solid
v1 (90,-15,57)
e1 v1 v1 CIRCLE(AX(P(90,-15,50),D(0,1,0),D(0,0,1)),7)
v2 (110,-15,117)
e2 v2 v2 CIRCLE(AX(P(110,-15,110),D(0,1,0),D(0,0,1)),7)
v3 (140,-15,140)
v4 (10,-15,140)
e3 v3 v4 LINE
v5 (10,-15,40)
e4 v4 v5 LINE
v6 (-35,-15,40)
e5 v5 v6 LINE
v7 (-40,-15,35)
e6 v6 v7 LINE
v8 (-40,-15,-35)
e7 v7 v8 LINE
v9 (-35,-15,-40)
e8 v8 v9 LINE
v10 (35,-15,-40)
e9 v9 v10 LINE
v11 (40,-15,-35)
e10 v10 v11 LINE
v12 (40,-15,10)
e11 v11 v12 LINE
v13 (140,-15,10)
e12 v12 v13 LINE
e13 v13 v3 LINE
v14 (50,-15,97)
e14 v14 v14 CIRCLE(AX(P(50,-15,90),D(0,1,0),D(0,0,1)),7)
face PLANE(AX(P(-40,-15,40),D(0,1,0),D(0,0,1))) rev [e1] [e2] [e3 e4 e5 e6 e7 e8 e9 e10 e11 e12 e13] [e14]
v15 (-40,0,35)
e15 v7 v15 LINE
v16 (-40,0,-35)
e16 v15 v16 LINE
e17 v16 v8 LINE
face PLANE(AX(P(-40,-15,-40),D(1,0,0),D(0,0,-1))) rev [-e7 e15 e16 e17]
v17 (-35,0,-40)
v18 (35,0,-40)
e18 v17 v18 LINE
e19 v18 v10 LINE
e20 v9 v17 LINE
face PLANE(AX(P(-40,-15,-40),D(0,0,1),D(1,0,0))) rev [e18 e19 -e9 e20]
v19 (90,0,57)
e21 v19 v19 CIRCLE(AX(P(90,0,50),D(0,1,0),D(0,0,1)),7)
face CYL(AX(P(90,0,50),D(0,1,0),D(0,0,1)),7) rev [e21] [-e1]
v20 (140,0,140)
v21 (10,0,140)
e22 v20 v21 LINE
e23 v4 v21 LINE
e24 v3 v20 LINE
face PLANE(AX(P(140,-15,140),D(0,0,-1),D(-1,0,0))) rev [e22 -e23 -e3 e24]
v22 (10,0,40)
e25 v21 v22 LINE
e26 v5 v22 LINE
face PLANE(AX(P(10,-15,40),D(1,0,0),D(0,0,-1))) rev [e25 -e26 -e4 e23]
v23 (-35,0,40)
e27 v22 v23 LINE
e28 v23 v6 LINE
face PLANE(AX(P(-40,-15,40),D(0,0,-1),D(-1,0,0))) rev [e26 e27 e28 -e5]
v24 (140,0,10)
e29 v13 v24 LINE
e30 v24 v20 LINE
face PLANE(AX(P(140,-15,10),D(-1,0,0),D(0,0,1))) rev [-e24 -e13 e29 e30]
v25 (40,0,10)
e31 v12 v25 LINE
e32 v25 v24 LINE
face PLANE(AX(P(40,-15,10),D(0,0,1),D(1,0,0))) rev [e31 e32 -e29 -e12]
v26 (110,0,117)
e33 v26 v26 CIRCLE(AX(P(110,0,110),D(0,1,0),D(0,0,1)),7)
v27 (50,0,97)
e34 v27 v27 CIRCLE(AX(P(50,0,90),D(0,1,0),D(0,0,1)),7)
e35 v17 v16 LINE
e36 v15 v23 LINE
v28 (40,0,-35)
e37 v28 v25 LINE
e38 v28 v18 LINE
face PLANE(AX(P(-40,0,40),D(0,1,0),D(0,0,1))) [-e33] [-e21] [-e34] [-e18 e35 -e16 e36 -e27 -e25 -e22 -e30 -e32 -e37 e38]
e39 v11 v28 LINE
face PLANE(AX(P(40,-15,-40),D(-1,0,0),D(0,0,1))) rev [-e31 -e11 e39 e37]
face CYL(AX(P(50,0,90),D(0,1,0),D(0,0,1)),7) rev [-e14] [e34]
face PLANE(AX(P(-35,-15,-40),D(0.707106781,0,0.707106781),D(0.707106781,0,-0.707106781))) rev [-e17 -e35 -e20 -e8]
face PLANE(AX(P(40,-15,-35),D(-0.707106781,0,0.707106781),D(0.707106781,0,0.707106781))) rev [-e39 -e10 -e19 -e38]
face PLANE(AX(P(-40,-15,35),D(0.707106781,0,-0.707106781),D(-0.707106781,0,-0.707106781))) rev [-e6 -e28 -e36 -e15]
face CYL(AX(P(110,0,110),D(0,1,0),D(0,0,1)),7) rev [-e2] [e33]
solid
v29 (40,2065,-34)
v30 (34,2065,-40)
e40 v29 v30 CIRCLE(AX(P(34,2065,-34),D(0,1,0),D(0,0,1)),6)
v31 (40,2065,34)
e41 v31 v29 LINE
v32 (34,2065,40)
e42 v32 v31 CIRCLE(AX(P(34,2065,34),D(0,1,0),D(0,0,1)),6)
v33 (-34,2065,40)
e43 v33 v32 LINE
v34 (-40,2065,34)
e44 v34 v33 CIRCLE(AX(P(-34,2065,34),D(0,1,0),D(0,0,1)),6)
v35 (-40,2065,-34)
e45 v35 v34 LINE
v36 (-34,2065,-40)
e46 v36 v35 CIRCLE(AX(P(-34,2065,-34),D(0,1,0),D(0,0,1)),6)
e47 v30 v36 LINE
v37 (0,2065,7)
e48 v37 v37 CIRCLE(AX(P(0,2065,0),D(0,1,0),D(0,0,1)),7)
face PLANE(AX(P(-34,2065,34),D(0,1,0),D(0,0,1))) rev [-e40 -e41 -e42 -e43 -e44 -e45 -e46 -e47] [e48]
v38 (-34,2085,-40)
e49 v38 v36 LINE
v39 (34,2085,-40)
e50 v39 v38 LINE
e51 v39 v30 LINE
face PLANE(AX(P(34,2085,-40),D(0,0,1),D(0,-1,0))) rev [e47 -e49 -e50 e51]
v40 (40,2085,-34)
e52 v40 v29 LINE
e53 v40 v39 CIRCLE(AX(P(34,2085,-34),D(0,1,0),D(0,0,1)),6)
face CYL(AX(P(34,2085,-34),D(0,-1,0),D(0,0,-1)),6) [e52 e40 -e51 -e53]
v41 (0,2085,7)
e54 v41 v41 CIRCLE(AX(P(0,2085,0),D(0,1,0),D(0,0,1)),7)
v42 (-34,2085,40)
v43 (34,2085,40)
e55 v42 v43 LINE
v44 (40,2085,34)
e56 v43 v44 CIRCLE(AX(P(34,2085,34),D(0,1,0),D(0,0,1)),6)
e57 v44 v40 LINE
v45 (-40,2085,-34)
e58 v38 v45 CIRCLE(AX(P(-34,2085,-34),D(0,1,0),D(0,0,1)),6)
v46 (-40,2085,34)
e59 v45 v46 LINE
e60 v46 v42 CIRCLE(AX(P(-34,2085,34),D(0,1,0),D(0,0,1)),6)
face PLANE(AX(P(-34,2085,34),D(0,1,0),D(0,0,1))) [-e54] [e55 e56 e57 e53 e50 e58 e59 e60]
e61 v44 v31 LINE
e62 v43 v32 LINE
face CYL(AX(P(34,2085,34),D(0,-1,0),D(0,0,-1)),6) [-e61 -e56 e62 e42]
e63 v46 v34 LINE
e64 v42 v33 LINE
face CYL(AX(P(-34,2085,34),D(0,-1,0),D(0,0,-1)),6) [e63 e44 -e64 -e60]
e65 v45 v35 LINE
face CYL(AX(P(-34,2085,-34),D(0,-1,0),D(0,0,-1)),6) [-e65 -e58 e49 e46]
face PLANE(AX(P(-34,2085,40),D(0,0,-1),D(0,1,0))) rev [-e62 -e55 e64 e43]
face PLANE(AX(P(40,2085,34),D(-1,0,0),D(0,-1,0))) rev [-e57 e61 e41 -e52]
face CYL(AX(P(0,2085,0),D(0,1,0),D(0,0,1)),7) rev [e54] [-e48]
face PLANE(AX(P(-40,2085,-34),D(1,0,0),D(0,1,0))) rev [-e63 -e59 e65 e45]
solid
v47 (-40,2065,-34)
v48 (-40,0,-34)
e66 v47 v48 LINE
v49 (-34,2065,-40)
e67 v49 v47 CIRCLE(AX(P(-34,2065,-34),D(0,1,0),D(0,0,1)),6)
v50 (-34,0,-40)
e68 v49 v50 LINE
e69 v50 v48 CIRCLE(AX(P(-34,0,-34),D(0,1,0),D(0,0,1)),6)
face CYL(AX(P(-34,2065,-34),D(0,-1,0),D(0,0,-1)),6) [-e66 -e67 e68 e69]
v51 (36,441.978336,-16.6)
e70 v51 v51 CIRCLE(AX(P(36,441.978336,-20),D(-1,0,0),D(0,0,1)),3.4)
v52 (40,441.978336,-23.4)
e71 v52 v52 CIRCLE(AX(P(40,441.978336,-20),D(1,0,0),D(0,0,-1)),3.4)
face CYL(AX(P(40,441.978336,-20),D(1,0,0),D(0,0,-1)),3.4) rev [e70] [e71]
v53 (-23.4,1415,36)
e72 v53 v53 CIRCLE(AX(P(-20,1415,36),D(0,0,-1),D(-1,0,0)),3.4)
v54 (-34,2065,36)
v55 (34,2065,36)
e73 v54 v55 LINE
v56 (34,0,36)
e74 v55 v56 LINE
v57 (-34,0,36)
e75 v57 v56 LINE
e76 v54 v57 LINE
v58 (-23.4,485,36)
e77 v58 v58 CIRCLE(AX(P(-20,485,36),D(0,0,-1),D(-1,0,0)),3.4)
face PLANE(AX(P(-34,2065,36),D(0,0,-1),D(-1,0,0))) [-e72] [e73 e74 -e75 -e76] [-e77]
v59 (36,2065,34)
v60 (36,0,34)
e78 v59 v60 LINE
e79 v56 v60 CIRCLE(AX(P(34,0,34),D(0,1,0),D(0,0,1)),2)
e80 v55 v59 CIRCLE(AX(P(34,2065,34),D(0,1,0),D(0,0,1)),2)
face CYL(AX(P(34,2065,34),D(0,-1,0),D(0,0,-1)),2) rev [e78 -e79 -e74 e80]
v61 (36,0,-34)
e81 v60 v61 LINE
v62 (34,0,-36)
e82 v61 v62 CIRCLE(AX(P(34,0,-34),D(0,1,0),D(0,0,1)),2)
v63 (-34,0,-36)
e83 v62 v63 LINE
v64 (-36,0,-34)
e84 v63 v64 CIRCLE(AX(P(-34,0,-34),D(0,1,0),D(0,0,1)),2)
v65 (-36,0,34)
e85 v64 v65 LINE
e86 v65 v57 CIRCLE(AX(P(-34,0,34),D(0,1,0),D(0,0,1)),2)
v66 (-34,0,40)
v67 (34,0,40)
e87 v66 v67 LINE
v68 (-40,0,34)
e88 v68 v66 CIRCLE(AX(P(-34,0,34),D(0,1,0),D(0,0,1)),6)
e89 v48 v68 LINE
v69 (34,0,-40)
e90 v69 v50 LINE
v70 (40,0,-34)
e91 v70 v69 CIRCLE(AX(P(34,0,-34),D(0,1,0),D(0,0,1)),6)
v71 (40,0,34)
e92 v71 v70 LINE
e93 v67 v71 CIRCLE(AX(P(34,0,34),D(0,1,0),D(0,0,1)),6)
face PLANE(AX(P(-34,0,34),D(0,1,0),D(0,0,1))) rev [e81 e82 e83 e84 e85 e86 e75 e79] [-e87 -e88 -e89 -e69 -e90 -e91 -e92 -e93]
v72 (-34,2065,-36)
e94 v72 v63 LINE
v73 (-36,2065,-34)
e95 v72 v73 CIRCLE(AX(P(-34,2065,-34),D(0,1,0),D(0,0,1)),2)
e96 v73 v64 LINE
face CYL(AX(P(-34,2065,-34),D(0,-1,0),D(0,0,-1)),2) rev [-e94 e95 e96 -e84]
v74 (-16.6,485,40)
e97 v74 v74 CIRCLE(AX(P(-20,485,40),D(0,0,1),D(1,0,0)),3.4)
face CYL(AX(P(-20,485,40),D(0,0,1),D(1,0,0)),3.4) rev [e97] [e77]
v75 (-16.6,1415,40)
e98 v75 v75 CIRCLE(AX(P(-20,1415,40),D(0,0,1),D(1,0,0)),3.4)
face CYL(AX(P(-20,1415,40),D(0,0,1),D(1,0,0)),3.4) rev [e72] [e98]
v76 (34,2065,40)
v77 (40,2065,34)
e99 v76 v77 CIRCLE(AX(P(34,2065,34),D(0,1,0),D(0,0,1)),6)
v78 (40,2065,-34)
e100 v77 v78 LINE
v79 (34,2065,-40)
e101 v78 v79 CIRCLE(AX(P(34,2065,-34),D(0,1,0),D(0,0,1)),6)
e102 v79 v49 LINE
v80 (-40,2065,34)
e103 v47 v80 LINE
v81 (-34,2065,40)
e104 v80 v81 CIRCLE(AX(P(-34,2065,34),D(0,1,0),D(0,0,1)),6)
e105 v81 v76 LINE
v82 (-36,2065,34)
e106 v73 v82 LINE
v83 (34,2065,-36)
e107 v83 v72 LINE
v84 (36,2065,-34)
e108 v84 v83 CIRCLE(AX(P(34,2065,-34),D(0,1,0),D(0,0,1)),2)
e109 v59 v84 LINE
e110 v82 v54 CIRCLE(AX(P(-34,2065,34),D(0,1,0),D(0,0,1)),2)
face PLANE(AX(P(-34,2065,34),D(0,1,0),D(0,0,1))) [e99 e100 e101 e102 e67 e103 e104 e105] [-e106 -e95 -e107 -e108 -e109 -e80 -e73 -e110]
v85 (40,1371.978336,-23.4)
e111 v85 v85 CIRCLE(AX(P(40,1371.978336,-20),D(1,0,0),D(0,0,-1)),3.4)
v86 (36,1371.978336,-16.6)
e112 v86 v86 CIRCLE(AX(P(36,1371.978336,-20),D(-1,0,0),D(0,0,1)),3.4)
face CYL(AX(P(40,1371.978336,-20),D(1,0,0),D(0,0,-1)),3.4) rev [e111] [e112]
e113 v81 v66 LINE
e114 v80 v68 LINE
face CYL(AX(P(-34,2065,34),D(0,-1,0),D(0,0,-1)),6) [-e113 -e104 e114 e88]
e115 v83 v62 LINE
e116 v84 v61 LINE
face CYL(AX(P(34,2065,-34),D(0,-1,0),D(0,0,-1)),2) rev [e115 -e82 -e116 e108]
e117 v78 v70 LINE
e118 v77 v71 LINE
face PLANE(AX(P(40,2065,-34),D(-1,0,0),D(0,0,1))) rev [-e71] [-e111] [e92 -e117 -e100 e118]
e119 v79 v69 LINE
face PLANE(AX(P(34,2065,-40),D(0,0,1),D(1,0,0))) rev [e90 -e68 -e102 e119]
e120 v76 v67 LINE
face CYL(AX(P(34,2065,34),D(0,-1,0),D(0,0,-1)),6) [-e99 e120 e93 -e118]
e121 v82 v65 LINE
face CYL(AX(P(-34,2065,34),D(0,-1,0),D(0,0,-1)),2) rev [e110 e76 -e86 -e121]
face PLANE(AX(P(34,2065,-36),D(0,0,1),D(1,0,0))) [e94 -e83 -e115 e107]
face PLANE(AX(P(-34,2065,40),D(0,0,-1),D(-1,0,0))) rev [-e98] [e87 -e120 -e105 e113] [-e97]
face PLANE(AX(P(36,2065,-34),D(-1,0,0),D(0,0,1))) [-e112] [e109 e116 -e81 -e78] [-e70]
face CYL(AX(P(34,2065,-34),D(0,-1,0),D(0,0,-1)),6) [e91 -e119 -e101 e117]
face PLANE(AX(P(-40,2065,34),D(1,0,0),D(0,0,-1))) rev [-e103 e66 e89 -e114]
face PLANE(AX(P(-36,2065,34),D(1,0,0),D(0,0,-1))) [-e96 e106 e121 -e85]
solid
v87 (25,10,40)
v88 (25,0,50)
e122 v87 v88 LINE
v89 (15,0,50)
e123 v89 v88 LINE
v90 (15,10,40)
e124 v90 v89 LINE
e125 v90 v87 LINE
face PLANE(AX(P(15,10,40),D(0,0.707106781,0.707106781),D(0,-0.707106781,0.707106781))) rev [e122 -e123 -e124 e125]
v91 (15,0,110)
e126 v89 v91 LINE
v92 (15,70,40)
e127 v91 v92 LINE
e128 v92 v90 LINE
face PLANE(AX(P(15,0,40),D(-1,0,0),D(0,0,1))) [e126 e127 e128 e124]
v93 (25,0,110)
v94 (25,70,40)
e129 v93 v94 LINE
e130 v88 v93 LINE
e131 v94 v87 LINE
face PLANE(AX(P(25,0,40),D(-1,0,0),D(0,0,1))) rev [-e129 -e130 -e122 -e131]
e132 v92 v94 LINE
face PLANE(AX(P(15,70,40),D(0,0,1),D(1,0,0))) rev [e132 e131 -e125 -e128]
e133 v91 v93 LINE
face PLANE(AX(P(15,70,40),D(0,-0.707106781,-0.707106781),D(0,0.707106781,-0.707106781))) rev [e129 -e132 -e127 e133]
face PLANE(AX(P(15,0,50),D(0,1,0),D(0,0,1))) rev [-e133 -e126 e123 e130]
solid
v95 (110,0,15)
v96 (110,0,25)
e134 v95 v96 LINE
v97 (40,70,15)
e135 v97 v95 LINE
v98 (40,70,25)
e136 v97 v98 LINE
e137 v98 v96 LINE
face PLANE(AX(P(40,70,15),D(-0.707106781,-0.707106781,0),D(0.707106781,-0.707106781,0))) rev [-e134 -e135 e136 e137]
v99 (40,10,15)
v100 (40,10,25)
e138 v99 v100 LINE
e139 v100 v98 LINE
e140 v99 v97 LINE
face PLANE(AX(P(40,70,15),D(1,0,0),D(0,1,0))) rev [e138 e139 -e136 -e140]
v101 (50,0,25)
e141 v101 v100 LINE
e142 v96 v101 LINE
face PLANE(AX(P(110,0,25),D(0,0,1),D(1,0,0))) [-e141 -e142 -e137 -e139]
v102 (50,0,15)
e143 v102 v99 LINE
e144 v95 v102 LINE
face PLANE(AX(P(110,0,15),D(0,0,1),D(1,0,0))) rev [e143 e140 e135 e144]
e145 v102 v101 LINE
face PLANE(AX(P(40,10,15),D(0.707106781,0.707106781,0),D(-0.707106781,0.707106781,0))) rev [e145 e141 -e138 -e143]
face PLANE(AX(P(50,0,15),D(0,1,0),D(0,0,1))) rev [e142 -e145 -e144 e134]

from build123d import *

# Parameters (mm, degrees)
MEMBER_1_DEPTH                   = 2065
EXTRUDE_1_DEPTH                  = 15
HOLE_WIZARD_14_0_14_1_AT_2_COUNT = 2
HOLE_WIZARD_14_0_14_1_AT_2_PITCH = 63.245553203
HOLE_WIZARD_14_0_14_1_AT_3_COUNT = 2
HOLE_WIZARD_14_0_14_1_AT_3_PITCH = 63.245553203
EXTRUDE_2_DEPTH                  = 10
EXTRUDE_3_DEPTH                  = 10
CHAMFER_1_SIZE                   = 5
EXTRUDE_6_DEPTH                  = 20
HOLE_START                       = 36
HOLE_WIZARD_M8_1_OUTLINE_R       = 3.4
HOLE_WIZARD_M8_1_DEPTH           = 4
HOLE_WIZARD_M8_2_OUTLINE_R       = 3.4
HOLE_WIZARD_M8_2_DEPTH           = 4


# Read off the part's stored shape, not the designer's step: M8 螺纹孔1, M8 螺纹孔2
with BuildPart() as part:
    # Sketch11 → Member 1 (new body)
    with BuildSketch(Plane(origin=(0, 0, 0), x_dir=(-1, 0, 0), z_dir=(0, 1, 0))):
        with BuildLine():
            Line((-34, -40), (34, -40))
            ThreePointArc((34, -40), (38.242640687, -38.242640687), (40, -34))
            Line((40, -34), (40, 34))
            ThreePointArc((40, 34), (38.242640687, 38.242640687), (34, 40))
            Line((34, 40), (-34, 40))
            ThreePointArc((-34, 40), (-38.242640687, 38.242640687), (-40, 34))
            Line((-40, 34), (-40, -34))
            ThreePointArc((-40, -34), (-38.242640687, -38.242640687), (-34, -40))
        make_face()
        with BuildLine():
            Line((-34, -36), (34, -36))
            ThreePointArc((34, -36), (35.414213562, -35.414213562), (36, -34))
            Line((36, -34), (36, 34))
            ThreePointArc((36, 34), (35.414213562, 35.414213562), (34, 36))
            Line((34, 36), (-34, 36))
            ThreePointArc((-34, 36), (-35.414213562, 35.414213562), (-36, 34))
            Line((-36, 34), (-36, -34))
            ThreePointArc((-36, -34), (-35.414213562, -35.414213562), (-34, -36))
        make_face(mode=Mode.SUBTRACT)
    extrude(amount=MEMBER_1_DEPTH)

    # M8 螺纹孔1 outline → M8 螺纹孔1 (cut)
    with BuildSketch(Plane.XY.offset(HOLE_START)):
        with Locations((-20, 485)):
            Circle(HOLE_WIZARD_M8_1_OUTLINE_R)
        with Locations((-20, 1415)):
            Circle(HOLE_WIZARD_M8_1_OUTLINE_R)
    extrude(amount=HOLE_WIZARD_M8_1_DEPTH, mode=Mode.SUBTRACT)

    # M8 螺纹孔2 outline → M8 螺纹孔2 (cut)
    with BuildSketch(Plane.YZ.offset(HOLE_START)):
        with Locations((441.978336483, -19.999999762)):
            Circle(HOLE_WIZARD_M8_2_OUTLINE_R)
        with Locations((1371.978336483, -19.999999762)):
            Circle(HOLE_WIZARD_M8_2_OUTLINE_R)
    extrude(amount=HOLE_WIZARD_M8_2_DEPTH, mode=Mode.SUBTRACT)


with BuildPart() as body_2:
    # 草图3 → 凸台-拉伸1 (new body)
    with BuildSketch(Plane.XZ):
        Polygon((10, 40), (10, 140), (140, 140), (140, 10), (40, 10), (40, -40), (-40, -40), (-40, 40), align=None)
    extrude(amount=EXTRUDE_1_DEPTH)

    # 草图4 → Ø14.0 (14) 直径孔1 (revolve, cut)
    with BuildSketch(Plane(origin=(110, 0, 110), x_dir=(0, 0, 1), z_dir=(1, 0, 0))):
        Polygon((0, 0), (0, 44.206024333), (7, 40), (7, 0), align=None)
    hole_wizard_14_0_14_1 = revolve(axis=Axis((110, 6.35, 110), (0, -1, 0)), mode=Mode.SUBTRACT)

    # Ø14.0 (14) 直径孔1 at 2: Ø14.0 (14) 直径孔1 ×2
    with Locations(*[Vector(-0.9486832980505139, 0, -0.316227766016838) * (i * HOLE_WIZARD_14_0_14_1_AT_2_PITCH) for i in range(1, HOLE_WIZARD_14_0_14_1_AT_2_COUNT)]):
        add(hole_wizard_14_0_14_1, mode=Mode.SUBTRACT)

    # Ø14.0 (14) 直径孔1 at 3: Ø14.0 (14) 直径孔1 ×2
    with Locations(*[Vector(-0.3162277660168379, 0, -0.9486832980505139) * (i * HOLE_WIZARD_14_0_14_1_AT_3_PITCH) for i in range(1, HOLE_WIZARD_14_0_14_1_AT_3_COUNT)]):
        add(hole_wizard_14_0_14_1, mode=Mode.SUBTRACT)

    # 倒角1
    chamfer_1_edges = [body_2.edges().sort_by_distance(p)[0] for p in [
        (-40, -7.5, 40),
        (40, -7.5, -40),
        (-40, -7.5, -40),
    ]]
    chamfer(chamfer_1_edges, length=CHAMFER_1_SIZE)


with BuildPart() as body_3:
    # 草图6 → 凸台-拉伸2 (new body)
    with BuildSketch(Plane.ZY.offset(-25)):
        Polygon((40, 70), (110, 0), (50, 0), (40, 10), align=None)
    extrude(amount=EXTRUDE_2_DEPTH)


with BuildPart() as body_4:
    # 草图7 → 凸台-拉伸3 (new body)
    with BuildSketch(Plane(origin=(0, 0, 25), x_dir=(-1, 0, 0), z_dir=(0, 0, -1))):
        Polygon((-40, 70), (-40, 10), (-50, 0), (-110, 0), align=None)
    extrude(amount=EXTRUDE_3_DEPTH)


with BuildPart() as body_5:
    # 草图26 → 凸台-拉伸6 (new body)
    with BuildSketch(Plane(origin=(0, 2065, 0), x_dir=(1, 0, 0), z_dir=(0, 1, 0))):
        with BuildLine():
            Line((-34, -40), (34, -40))
            ThreePointArc((34, -40), (38.242640687, -38.242640687), (40, -34))
            Line((40, -34), (40, 34))
            ThreePointArc((40, 34), (38.242640687, 38.242640687), (34, 40))
            Line((34, 40), (-34, 40))
            ThreePointArc((-34, 40), (-38.242640687, 38.242640687), (-40, 34))
            Line((-40, 34), (-40, -34))
            ThreePointArc((-40, -34), (-38.242640687, -38.242640687), (-34, -40))
        make_face()
    extrude(amount=EXTRUDE_6_DEPTH)

    # 草图27 → M16 螺纹孔1 (revolve, cut)
    with BuildSketch(Plane(origin=(0, 2085, 0), x_dir=(0, 0, 1), z_dir=(1, 0, 0))):
        Polygon((0, 0), (0, 46.206024333), (7, 42), (7, 0), align=None)
    revolve(axis=Axis((0, 2091.35, 0), (0, -1, 0)), mode=Mode.SUBTRACT)


solid = Compound([part.part, body_2.part, body_3.part, body_4.part, body_5.part])
